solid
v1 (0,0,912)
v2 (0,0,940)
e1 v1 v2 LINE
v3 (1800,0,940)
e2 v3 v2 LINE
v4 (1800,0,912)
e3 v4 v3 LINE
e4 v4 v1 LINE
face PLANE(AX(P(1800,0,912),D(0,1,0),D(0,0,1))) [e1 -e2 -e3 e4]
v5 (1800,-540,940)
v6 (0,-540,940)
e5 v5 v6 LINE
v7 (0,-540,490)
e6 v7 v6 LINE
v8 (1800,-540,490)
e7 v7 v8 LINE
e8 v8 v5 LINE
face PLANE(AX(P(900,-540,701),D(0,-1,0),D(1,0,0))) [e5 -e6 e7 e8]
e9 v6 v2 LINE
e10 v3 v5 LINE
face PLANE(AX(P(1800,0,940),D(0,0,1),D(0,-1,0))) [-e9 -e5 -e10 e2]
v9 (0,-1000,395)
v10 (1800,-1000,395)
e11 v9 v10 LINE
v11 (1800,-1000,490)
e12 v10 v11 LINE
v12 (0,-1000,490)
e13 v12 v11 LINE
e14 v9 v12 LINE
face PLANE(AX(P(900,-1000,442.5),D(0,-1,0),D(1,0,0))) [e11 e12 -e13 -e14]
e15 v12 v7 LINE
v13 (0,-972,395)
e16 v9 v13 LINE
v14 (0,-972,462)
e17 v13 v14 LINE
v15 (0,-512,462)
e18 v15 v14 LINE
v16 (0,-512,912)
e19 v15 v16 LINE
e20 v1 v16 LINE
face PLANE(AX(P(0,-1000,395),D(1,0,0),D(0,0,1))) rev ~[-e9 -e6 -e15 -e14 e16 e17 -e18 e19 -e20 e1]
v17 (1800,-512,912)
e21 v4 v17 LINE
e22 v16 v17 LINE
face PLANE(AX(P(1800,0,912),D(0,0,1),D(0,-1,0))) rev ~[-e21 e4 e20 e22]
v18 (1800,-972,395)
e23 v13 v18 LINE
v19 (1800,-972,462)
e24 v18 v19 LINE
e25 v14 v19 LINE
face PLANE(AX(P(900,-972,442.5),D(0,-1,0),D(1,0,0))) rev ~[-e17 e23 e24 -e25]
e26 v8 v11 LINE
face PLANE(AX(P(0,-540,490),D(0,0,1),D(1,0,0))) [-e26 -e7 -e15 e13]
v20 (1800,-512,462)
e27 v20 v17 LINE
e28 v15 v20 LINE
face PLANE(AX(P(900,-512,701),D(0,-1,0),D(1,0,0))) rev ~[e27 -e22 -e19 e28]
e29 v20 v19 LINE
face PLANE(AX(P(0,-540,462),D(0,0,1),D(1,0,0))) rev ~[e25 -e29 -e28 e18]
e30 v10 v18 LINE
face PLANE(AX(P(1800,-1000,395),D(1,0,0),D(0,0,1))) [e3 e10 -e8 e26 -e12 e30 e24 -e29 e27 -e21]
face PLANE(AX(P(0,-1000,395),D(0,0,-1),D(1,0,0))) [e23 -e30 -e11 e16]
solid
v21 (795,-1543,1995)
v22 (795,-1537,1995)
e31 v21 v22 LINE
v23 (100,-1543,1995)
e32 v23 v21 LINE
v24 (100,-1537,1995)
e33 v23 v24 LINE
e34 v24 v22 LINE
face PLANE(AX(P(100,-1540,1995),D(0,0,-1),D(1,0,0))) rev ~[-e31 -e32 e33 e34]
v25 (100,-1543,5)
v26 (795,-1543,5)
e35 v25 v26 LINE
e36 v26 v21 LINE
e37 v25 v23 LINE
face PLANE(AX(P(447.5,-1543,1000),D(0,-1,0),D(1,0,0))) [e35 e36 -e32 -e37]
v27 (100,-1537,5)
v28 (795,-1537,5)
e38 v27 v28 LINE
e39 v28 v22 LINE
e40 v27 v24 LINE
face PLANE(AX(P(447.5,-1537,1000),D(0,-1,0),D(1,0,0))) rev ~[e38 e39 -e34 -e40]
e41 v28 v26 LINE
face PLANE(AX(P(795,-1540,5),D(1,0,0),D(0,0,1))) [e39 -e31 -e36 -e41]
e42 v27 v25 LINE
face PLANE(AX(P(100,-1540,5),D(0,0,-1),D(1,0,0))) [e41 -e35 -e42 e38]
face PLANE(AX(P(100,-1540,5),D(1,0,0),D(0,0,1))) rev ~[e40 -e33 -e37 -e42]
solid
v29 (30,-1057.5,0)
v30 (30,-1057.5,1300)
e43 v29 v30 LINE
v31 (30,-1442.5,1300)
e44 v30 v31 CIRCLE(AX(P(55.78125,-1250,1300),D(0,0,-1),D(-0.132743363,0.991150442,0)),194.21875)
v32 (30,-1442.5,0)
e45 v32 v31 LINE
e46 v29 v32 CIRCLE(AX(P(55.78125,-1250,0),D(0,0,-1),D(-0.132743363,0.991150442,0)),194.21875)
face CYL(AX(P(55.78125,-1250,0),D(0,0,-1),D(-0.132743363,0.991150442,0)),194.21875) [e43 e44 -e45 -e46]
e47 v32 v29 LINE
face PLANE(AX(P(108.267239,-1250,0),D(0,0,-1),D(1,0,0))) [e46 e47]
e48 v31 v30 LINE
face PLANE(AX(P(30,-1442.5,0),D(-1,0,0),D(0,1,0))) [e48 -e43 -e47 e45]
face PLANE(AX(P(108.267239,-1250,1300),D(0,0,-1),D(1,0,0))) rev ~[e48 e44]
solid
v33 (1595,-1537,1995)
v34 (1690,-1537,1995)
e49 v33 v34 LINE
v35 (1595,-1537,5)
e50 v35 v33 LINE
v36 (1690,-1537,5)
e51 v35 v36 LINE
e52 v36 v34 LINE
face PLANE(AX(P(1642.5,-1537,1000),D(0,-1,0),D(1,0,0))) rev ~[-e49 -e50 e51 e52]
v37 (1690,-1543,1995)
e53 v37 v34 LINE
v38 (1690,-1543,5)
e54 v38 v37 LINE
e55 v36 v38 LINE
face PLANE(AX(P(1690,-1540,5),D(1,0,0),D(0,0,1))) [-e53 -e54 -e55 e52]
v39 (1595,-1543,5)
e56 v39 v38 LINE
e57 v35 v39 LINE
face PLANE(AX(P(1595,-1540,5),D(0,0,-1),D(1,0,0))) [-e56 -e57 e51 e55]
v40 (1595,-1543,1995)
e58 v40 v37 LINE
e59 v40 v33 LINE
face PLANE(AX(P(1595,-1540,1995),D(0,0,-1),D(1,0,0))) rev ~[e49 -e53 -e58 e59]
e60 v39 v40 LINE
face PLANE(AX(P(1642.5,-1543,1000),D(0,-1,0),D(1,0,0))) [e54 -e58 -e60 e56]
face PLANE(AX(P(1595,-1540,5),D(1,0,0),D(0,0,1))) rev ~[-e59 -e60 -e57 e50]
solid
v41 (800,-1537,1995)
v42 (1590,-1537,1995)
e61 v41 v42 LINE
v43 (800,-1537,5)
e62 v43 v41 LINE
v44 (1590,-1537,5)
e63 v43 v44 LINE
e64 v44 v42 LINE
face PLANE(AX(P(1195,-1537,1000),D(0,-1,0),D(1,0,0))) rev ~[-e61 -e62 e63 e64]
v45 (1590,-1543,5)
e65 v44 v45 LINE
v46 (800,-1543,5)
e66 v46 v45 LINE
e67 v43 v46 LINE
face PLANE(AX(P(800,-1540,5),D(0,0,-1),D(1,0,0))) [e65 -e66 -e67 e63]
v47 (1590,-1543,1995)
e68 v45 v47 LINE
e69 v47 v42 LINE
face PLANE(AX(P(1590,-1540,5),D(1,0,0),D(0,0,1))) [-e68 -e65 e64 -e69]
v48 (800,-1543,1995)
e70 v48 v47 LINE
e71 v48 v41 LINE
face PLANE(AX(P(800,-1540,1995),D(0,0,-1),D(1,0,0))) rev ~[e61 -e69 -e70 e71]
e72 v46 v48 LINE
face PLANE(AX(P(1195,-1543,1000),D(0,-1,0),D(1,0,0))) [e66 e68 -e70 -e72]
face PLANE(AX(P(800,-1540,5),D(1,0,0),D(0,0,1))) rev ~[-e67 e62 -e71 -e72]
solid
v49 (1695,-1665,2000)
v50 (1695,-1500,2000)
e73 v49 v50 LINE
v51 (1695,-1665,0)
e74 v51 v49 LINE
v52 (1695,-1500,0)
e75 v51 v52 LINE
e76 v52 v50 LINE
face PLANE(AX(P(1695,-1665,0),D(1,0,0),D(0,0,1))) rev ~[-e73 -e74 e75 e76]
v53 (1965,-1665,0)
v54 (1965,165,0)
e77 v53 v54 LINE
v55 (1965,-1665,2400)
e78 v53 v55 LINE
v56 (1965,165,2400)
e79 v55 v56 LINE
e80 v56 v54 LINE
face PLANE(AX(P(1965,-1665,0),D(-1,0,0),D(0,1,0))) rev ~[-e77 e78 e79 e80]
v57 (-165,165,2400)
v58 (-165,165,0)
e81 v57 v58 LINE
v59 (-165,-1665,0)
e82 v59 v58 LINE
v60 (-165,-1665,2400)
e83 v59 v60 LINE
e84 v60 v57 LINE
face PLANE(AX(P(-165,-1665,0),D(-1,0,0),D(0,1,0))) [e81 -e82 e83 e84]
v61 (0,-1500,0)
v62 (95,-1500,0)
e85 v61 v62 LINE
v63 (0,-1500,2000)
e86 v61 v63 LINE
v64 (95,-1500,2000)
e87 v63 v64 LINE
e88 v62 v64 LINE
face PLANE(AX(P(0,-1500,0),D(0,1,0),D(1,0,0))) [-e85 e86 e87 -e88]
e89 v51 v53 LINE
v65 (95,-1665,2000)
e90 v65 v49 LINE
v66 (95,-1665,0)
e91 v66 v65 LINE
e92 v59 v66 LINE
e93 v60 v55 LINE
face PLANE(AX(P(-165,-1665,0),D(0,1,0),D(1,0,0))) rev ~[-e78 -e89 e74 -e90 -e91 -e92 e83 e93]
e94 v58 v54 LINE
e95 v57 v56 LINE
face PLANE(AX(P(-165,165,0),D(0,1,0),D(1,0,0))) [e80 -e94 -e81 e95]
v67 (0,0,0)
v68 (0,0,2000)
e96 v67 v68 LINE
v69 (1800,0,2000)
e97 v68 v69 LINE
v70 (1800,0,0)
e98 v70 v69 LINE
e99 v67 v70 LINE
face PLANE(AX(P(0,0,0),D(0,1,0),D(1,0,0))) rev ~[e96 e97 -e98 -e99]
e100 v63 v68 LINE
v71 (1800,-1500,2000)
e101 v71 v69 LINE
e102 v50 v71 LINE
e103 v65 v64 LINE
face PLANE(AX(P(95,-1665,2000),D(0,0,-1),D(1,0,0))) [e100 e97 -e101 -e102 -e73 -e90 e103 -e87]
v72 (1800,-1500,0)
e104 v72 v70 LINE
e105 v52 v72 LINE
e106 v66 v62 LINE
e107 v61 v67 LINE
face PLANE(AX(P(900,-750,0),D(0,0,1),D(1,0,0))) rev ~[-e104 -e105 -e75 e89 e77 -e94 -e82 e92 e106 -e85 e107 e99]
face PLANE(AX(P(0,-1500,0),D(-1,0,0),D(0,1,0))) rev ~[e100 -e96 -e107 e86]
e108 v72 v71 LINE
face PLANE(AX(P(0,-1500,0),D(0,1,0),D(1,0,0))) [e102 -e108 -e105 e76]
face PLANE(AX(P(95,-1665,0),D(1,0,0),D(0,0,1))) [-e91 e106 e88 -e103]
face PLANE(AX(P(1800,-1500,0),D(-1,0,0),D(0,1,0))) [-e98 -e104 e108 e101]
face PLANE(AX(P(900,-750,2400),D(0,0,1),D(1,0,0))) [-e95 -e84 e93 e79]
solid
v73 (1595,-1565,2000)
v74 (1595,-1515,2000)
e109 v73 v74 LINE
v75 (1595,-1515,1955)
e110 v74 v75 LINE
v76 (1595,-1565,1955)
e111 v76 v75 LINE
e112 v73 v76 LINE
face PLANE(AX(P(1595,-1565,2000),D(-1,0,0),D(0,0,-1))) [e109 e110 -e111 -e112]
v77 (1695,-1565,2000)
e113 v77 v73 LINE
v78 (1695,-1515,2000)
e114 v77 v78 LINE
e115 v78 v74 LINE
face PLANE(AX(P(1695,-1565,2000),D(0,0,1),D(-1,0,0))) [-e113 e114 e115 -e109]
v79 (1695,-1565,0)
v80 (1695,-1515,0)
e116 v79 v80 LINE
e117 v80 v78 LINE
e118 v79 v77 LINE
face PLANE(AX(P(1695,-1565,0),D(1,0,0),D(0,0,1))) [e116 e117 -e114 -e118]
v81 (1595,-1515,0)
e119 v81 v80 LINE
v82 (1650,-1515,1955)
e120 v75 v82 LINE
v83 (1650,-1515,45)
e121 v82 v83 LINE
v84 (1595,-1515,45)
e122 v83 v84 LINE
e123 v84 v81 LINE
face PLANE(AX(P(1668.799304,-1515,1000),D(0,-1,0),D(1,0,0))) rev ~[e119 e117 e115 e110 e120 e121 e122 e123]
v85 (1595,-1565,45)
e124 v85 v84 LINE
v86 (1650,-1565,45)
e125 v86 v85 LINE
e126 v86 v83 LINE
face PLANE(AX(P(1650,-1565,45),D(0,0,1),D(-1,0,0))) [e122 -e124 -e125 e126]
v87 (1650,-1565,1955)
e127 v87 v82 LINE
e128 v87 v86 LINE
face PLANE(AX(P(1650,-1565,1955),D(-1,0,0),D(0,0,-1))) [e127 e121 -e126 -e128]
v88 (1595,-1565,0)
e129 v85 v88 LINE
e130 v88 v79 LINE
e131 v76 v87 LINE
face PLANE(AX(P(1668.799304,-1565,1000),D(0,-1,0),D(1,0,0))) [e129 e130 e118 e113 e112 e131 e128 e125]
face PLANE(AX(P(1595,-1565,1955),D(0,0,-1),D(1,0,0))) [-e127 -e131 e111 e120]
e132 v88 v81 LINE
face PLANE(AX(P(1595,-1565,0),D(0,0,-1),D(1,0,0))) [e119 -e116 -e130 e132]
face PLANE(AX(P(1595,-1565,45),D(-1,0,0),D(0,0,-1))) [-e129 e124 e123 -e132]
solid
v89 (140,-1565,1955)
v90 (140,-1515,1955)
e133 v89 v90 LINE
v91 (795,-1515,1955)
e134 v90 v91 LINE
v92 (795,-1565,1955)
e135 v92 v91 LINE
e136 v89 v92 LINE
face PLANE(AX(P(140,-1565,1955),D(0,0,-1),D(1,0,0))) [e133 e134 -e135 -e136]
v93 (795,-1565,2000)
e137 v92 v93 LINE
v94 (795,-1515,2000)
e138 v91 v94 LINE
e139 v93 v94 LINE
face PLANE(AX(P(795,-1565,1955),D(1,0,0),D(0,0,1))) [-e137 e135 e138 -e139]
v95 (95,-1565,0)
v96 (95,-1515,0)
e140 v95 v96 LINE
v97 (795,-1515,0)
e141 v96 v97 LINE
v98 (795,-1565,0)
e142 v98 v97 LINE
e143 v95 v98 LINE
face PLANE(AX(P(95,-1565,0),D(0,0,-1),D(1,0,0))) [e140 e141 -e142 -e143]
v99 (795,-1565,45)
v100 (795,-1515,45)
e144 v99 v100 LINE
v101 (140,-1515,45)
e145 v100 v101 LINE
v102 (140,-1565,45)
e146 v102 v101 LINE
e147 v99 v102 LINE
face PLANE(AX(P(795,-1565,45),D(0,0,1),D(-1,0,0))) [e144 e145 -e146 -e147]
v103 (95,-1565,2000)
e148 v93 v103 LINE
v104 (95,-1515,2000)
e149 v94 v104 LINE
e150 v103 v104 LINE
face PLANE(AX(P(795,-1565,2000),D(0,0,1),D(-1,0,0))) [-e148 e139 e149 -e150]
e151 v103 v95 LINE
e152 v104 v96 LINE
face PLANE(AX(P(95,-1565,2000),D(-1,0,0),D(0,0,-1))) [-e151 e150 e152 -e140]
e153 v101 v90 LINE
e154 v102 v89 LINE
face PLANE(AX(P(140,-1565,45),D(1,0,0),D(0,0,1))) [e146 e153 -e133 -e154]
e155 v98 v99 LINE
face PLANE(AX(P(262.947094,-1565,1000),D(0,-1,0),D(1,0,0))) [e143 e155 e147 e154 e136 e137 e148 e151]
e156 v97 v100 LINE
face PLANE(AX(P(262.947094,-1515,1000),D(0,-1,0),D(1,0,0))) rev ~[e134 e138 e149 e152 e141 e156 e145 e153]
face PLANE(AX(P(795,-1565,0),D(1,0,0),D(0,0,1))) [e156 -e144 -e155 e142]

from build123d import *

# Parameters (mm, degrees)
F0_W      = 2130
F0_H      = 1830
F0_W_2    = 1800
F0_H_2    = 1500
F1_DEPTH  = 2400
F2_W      = 1600
F2_H      = 2000
F3_DEPTH  = 165
F4_W      = 2130
F4_H      = 1830
F5_DEPTH  = 400
F8_DEPTH  = 50
F10_W     = 695
F10_H     = 1990
F11_DEPTH = 3
F10_W_2   = 790
F10_W_3   = 95
F12_W     = 540
F12_H     = 28
F13_DEPTH = 1800
F14_W     = 1800
F14_H     = 478
F15_DEPTH = 28
F16_W     = 1800
F16_H     = 28
F17_DEPTH = 460
F18_W     = 1800
F18_H     = 95
F19_DEPTH = 28
F21_DEPTH = 1300


with BuildPart() as f1:
    # F0 (on Top) → F1 (new body)
    with BuildSketch(Plane.XY):
        with Locations((900, -750)):
            Rectangle(F0_W, F0_H)
        with Locations((900, -750)):
            Rectangle(F0_W_2, F0_H_2, mode=Mode.SUBTRACT)
    extrude(amount=F1_DEPTH)

    # F2 (on face) → F3 (cut, through all)
    with BuildSketch(Plane.XZ.offset(1665)):
        with Locations((895, 1000)):
            Rectangle(F2_W, F2_H)
    extrude(amount=-F3_DEPTH, mode=Mode.SUBTRACT)

    # F4 (on face) → F5 (join, through all)
    with BuildSketch(Plane.XY.offset(2400)):
        with Locations((900, -750)):
            Rectangle(F4_W, F4_H)
    extrude(amount=-F5_DEPTH)


with BuildPart() as f8:
    # F7 (on offset) → F8 (new body)
    with BuildSketch(Plane.XZ.offset(1565)):
        Polygon((795, 45), (140, 45), (140, 1955), (795, 1955), (795, 2000), (95, 2000), (95, 0), (795, 0), align=None)
    extrude(amount=-F8_DEPTH)


with BuildPart() as f8b:
    # F7 (on offset) → F8, piece 2 (new body)
    with BuildSketch(Plane.XZ.offset(1565)):
        Polygon((1595, 1955), (1650, 1955), (1650, 45), (1595, 45), (1595, 0), (1695, 0), (1695, 2000), (1595, 2000), align=None)
    extrude(amount=-F8_DEPTH)


with BuildPart() as f11:
    # F10 (on offset) → F11 (new body, symmetric)
    with BuildSketch(Plane.XZ.offset(1540)):
        with Locations((447.5, 1000)):
            Rectangle(F10_W, F10_H)
    extrude(amount=F11_DEPTH, both=True)


with BuildPart() as f11b:
    # F10 (on offset) → F11, piece 2 (new body, symmetric)
    with BuildSketch(Plane.XZ.offset(1540)):
        with Locations((1195, 1000)):
            Rectangle(F10_W_2, F10_H)
    extrude(amount=F11_DEPTH, both=True)


with BuildPart() as f11c:
    # F10 (on offset) → F11, piece 3 (new body, symmetric)
    with BuildSketch(Plane.XZ.offset(1540)):
        with Locations((1642.5, 1000)):
            Rectangle(F10_W_3, F10_H)
    extrude(amount=F11_DEPTH, both=True)


with BuildPart() as f13:
    # F12 (on face) → F13 (new body, through all)
    with BuildSketch(Plane(origin=(1800, 0, 0), x_dir=(0, -1, 0), z_dir=(-1, 0, 0))):
        with Locations((270, 926)):
            Rectangle(F12_W, F12_H)
    extrude(amount=F13_DEPTH)

    # F14 (on face) → F15 (join)
    with BuildSketch(Plane.XZ.offset(540)):
        with Locations((900, 701)):
            Rectangle(F14_W, F14_H)
    extrude(amount=-F15_DEPTH)

    # F16 (on face) → F17 (join)
    with BuildSketch(Plane.XZ.offset(540)):
        with Locations((900, 476)):
            Rectangle(F16_W, F16_H)
    extrude(amount=F17_DEPTH)

    # F18 (on face) → F19 (join)
    with BuildSketch(Plane.XZ.offset(1000)):
        with Locations((900, 442.5)):
            Rectangle(F18_W, F18_H)
    extrude(amount=-F19_DEPTH)


with BuildPart() as f21:
    # F20 (on face) → F21 (new body)
    with BuildSketch(Plane(origin=(0, 0, 0), x_dir=(1, 0, 0), z_dir=(0, 0, -1))):
        with BuildLine():
            Line((30, 1442.5), (30, 1057.5))
            ThreePointArc((30, 1057.5), (250, 1250), (30, 1442.5))
        make_face()
    extrude(amount=-F21_DEPTH)


solid = Compound([f1.part, f8.part, f8b.part, f11.part, f11b.part, f11c.part, f13.part, f21.part])
